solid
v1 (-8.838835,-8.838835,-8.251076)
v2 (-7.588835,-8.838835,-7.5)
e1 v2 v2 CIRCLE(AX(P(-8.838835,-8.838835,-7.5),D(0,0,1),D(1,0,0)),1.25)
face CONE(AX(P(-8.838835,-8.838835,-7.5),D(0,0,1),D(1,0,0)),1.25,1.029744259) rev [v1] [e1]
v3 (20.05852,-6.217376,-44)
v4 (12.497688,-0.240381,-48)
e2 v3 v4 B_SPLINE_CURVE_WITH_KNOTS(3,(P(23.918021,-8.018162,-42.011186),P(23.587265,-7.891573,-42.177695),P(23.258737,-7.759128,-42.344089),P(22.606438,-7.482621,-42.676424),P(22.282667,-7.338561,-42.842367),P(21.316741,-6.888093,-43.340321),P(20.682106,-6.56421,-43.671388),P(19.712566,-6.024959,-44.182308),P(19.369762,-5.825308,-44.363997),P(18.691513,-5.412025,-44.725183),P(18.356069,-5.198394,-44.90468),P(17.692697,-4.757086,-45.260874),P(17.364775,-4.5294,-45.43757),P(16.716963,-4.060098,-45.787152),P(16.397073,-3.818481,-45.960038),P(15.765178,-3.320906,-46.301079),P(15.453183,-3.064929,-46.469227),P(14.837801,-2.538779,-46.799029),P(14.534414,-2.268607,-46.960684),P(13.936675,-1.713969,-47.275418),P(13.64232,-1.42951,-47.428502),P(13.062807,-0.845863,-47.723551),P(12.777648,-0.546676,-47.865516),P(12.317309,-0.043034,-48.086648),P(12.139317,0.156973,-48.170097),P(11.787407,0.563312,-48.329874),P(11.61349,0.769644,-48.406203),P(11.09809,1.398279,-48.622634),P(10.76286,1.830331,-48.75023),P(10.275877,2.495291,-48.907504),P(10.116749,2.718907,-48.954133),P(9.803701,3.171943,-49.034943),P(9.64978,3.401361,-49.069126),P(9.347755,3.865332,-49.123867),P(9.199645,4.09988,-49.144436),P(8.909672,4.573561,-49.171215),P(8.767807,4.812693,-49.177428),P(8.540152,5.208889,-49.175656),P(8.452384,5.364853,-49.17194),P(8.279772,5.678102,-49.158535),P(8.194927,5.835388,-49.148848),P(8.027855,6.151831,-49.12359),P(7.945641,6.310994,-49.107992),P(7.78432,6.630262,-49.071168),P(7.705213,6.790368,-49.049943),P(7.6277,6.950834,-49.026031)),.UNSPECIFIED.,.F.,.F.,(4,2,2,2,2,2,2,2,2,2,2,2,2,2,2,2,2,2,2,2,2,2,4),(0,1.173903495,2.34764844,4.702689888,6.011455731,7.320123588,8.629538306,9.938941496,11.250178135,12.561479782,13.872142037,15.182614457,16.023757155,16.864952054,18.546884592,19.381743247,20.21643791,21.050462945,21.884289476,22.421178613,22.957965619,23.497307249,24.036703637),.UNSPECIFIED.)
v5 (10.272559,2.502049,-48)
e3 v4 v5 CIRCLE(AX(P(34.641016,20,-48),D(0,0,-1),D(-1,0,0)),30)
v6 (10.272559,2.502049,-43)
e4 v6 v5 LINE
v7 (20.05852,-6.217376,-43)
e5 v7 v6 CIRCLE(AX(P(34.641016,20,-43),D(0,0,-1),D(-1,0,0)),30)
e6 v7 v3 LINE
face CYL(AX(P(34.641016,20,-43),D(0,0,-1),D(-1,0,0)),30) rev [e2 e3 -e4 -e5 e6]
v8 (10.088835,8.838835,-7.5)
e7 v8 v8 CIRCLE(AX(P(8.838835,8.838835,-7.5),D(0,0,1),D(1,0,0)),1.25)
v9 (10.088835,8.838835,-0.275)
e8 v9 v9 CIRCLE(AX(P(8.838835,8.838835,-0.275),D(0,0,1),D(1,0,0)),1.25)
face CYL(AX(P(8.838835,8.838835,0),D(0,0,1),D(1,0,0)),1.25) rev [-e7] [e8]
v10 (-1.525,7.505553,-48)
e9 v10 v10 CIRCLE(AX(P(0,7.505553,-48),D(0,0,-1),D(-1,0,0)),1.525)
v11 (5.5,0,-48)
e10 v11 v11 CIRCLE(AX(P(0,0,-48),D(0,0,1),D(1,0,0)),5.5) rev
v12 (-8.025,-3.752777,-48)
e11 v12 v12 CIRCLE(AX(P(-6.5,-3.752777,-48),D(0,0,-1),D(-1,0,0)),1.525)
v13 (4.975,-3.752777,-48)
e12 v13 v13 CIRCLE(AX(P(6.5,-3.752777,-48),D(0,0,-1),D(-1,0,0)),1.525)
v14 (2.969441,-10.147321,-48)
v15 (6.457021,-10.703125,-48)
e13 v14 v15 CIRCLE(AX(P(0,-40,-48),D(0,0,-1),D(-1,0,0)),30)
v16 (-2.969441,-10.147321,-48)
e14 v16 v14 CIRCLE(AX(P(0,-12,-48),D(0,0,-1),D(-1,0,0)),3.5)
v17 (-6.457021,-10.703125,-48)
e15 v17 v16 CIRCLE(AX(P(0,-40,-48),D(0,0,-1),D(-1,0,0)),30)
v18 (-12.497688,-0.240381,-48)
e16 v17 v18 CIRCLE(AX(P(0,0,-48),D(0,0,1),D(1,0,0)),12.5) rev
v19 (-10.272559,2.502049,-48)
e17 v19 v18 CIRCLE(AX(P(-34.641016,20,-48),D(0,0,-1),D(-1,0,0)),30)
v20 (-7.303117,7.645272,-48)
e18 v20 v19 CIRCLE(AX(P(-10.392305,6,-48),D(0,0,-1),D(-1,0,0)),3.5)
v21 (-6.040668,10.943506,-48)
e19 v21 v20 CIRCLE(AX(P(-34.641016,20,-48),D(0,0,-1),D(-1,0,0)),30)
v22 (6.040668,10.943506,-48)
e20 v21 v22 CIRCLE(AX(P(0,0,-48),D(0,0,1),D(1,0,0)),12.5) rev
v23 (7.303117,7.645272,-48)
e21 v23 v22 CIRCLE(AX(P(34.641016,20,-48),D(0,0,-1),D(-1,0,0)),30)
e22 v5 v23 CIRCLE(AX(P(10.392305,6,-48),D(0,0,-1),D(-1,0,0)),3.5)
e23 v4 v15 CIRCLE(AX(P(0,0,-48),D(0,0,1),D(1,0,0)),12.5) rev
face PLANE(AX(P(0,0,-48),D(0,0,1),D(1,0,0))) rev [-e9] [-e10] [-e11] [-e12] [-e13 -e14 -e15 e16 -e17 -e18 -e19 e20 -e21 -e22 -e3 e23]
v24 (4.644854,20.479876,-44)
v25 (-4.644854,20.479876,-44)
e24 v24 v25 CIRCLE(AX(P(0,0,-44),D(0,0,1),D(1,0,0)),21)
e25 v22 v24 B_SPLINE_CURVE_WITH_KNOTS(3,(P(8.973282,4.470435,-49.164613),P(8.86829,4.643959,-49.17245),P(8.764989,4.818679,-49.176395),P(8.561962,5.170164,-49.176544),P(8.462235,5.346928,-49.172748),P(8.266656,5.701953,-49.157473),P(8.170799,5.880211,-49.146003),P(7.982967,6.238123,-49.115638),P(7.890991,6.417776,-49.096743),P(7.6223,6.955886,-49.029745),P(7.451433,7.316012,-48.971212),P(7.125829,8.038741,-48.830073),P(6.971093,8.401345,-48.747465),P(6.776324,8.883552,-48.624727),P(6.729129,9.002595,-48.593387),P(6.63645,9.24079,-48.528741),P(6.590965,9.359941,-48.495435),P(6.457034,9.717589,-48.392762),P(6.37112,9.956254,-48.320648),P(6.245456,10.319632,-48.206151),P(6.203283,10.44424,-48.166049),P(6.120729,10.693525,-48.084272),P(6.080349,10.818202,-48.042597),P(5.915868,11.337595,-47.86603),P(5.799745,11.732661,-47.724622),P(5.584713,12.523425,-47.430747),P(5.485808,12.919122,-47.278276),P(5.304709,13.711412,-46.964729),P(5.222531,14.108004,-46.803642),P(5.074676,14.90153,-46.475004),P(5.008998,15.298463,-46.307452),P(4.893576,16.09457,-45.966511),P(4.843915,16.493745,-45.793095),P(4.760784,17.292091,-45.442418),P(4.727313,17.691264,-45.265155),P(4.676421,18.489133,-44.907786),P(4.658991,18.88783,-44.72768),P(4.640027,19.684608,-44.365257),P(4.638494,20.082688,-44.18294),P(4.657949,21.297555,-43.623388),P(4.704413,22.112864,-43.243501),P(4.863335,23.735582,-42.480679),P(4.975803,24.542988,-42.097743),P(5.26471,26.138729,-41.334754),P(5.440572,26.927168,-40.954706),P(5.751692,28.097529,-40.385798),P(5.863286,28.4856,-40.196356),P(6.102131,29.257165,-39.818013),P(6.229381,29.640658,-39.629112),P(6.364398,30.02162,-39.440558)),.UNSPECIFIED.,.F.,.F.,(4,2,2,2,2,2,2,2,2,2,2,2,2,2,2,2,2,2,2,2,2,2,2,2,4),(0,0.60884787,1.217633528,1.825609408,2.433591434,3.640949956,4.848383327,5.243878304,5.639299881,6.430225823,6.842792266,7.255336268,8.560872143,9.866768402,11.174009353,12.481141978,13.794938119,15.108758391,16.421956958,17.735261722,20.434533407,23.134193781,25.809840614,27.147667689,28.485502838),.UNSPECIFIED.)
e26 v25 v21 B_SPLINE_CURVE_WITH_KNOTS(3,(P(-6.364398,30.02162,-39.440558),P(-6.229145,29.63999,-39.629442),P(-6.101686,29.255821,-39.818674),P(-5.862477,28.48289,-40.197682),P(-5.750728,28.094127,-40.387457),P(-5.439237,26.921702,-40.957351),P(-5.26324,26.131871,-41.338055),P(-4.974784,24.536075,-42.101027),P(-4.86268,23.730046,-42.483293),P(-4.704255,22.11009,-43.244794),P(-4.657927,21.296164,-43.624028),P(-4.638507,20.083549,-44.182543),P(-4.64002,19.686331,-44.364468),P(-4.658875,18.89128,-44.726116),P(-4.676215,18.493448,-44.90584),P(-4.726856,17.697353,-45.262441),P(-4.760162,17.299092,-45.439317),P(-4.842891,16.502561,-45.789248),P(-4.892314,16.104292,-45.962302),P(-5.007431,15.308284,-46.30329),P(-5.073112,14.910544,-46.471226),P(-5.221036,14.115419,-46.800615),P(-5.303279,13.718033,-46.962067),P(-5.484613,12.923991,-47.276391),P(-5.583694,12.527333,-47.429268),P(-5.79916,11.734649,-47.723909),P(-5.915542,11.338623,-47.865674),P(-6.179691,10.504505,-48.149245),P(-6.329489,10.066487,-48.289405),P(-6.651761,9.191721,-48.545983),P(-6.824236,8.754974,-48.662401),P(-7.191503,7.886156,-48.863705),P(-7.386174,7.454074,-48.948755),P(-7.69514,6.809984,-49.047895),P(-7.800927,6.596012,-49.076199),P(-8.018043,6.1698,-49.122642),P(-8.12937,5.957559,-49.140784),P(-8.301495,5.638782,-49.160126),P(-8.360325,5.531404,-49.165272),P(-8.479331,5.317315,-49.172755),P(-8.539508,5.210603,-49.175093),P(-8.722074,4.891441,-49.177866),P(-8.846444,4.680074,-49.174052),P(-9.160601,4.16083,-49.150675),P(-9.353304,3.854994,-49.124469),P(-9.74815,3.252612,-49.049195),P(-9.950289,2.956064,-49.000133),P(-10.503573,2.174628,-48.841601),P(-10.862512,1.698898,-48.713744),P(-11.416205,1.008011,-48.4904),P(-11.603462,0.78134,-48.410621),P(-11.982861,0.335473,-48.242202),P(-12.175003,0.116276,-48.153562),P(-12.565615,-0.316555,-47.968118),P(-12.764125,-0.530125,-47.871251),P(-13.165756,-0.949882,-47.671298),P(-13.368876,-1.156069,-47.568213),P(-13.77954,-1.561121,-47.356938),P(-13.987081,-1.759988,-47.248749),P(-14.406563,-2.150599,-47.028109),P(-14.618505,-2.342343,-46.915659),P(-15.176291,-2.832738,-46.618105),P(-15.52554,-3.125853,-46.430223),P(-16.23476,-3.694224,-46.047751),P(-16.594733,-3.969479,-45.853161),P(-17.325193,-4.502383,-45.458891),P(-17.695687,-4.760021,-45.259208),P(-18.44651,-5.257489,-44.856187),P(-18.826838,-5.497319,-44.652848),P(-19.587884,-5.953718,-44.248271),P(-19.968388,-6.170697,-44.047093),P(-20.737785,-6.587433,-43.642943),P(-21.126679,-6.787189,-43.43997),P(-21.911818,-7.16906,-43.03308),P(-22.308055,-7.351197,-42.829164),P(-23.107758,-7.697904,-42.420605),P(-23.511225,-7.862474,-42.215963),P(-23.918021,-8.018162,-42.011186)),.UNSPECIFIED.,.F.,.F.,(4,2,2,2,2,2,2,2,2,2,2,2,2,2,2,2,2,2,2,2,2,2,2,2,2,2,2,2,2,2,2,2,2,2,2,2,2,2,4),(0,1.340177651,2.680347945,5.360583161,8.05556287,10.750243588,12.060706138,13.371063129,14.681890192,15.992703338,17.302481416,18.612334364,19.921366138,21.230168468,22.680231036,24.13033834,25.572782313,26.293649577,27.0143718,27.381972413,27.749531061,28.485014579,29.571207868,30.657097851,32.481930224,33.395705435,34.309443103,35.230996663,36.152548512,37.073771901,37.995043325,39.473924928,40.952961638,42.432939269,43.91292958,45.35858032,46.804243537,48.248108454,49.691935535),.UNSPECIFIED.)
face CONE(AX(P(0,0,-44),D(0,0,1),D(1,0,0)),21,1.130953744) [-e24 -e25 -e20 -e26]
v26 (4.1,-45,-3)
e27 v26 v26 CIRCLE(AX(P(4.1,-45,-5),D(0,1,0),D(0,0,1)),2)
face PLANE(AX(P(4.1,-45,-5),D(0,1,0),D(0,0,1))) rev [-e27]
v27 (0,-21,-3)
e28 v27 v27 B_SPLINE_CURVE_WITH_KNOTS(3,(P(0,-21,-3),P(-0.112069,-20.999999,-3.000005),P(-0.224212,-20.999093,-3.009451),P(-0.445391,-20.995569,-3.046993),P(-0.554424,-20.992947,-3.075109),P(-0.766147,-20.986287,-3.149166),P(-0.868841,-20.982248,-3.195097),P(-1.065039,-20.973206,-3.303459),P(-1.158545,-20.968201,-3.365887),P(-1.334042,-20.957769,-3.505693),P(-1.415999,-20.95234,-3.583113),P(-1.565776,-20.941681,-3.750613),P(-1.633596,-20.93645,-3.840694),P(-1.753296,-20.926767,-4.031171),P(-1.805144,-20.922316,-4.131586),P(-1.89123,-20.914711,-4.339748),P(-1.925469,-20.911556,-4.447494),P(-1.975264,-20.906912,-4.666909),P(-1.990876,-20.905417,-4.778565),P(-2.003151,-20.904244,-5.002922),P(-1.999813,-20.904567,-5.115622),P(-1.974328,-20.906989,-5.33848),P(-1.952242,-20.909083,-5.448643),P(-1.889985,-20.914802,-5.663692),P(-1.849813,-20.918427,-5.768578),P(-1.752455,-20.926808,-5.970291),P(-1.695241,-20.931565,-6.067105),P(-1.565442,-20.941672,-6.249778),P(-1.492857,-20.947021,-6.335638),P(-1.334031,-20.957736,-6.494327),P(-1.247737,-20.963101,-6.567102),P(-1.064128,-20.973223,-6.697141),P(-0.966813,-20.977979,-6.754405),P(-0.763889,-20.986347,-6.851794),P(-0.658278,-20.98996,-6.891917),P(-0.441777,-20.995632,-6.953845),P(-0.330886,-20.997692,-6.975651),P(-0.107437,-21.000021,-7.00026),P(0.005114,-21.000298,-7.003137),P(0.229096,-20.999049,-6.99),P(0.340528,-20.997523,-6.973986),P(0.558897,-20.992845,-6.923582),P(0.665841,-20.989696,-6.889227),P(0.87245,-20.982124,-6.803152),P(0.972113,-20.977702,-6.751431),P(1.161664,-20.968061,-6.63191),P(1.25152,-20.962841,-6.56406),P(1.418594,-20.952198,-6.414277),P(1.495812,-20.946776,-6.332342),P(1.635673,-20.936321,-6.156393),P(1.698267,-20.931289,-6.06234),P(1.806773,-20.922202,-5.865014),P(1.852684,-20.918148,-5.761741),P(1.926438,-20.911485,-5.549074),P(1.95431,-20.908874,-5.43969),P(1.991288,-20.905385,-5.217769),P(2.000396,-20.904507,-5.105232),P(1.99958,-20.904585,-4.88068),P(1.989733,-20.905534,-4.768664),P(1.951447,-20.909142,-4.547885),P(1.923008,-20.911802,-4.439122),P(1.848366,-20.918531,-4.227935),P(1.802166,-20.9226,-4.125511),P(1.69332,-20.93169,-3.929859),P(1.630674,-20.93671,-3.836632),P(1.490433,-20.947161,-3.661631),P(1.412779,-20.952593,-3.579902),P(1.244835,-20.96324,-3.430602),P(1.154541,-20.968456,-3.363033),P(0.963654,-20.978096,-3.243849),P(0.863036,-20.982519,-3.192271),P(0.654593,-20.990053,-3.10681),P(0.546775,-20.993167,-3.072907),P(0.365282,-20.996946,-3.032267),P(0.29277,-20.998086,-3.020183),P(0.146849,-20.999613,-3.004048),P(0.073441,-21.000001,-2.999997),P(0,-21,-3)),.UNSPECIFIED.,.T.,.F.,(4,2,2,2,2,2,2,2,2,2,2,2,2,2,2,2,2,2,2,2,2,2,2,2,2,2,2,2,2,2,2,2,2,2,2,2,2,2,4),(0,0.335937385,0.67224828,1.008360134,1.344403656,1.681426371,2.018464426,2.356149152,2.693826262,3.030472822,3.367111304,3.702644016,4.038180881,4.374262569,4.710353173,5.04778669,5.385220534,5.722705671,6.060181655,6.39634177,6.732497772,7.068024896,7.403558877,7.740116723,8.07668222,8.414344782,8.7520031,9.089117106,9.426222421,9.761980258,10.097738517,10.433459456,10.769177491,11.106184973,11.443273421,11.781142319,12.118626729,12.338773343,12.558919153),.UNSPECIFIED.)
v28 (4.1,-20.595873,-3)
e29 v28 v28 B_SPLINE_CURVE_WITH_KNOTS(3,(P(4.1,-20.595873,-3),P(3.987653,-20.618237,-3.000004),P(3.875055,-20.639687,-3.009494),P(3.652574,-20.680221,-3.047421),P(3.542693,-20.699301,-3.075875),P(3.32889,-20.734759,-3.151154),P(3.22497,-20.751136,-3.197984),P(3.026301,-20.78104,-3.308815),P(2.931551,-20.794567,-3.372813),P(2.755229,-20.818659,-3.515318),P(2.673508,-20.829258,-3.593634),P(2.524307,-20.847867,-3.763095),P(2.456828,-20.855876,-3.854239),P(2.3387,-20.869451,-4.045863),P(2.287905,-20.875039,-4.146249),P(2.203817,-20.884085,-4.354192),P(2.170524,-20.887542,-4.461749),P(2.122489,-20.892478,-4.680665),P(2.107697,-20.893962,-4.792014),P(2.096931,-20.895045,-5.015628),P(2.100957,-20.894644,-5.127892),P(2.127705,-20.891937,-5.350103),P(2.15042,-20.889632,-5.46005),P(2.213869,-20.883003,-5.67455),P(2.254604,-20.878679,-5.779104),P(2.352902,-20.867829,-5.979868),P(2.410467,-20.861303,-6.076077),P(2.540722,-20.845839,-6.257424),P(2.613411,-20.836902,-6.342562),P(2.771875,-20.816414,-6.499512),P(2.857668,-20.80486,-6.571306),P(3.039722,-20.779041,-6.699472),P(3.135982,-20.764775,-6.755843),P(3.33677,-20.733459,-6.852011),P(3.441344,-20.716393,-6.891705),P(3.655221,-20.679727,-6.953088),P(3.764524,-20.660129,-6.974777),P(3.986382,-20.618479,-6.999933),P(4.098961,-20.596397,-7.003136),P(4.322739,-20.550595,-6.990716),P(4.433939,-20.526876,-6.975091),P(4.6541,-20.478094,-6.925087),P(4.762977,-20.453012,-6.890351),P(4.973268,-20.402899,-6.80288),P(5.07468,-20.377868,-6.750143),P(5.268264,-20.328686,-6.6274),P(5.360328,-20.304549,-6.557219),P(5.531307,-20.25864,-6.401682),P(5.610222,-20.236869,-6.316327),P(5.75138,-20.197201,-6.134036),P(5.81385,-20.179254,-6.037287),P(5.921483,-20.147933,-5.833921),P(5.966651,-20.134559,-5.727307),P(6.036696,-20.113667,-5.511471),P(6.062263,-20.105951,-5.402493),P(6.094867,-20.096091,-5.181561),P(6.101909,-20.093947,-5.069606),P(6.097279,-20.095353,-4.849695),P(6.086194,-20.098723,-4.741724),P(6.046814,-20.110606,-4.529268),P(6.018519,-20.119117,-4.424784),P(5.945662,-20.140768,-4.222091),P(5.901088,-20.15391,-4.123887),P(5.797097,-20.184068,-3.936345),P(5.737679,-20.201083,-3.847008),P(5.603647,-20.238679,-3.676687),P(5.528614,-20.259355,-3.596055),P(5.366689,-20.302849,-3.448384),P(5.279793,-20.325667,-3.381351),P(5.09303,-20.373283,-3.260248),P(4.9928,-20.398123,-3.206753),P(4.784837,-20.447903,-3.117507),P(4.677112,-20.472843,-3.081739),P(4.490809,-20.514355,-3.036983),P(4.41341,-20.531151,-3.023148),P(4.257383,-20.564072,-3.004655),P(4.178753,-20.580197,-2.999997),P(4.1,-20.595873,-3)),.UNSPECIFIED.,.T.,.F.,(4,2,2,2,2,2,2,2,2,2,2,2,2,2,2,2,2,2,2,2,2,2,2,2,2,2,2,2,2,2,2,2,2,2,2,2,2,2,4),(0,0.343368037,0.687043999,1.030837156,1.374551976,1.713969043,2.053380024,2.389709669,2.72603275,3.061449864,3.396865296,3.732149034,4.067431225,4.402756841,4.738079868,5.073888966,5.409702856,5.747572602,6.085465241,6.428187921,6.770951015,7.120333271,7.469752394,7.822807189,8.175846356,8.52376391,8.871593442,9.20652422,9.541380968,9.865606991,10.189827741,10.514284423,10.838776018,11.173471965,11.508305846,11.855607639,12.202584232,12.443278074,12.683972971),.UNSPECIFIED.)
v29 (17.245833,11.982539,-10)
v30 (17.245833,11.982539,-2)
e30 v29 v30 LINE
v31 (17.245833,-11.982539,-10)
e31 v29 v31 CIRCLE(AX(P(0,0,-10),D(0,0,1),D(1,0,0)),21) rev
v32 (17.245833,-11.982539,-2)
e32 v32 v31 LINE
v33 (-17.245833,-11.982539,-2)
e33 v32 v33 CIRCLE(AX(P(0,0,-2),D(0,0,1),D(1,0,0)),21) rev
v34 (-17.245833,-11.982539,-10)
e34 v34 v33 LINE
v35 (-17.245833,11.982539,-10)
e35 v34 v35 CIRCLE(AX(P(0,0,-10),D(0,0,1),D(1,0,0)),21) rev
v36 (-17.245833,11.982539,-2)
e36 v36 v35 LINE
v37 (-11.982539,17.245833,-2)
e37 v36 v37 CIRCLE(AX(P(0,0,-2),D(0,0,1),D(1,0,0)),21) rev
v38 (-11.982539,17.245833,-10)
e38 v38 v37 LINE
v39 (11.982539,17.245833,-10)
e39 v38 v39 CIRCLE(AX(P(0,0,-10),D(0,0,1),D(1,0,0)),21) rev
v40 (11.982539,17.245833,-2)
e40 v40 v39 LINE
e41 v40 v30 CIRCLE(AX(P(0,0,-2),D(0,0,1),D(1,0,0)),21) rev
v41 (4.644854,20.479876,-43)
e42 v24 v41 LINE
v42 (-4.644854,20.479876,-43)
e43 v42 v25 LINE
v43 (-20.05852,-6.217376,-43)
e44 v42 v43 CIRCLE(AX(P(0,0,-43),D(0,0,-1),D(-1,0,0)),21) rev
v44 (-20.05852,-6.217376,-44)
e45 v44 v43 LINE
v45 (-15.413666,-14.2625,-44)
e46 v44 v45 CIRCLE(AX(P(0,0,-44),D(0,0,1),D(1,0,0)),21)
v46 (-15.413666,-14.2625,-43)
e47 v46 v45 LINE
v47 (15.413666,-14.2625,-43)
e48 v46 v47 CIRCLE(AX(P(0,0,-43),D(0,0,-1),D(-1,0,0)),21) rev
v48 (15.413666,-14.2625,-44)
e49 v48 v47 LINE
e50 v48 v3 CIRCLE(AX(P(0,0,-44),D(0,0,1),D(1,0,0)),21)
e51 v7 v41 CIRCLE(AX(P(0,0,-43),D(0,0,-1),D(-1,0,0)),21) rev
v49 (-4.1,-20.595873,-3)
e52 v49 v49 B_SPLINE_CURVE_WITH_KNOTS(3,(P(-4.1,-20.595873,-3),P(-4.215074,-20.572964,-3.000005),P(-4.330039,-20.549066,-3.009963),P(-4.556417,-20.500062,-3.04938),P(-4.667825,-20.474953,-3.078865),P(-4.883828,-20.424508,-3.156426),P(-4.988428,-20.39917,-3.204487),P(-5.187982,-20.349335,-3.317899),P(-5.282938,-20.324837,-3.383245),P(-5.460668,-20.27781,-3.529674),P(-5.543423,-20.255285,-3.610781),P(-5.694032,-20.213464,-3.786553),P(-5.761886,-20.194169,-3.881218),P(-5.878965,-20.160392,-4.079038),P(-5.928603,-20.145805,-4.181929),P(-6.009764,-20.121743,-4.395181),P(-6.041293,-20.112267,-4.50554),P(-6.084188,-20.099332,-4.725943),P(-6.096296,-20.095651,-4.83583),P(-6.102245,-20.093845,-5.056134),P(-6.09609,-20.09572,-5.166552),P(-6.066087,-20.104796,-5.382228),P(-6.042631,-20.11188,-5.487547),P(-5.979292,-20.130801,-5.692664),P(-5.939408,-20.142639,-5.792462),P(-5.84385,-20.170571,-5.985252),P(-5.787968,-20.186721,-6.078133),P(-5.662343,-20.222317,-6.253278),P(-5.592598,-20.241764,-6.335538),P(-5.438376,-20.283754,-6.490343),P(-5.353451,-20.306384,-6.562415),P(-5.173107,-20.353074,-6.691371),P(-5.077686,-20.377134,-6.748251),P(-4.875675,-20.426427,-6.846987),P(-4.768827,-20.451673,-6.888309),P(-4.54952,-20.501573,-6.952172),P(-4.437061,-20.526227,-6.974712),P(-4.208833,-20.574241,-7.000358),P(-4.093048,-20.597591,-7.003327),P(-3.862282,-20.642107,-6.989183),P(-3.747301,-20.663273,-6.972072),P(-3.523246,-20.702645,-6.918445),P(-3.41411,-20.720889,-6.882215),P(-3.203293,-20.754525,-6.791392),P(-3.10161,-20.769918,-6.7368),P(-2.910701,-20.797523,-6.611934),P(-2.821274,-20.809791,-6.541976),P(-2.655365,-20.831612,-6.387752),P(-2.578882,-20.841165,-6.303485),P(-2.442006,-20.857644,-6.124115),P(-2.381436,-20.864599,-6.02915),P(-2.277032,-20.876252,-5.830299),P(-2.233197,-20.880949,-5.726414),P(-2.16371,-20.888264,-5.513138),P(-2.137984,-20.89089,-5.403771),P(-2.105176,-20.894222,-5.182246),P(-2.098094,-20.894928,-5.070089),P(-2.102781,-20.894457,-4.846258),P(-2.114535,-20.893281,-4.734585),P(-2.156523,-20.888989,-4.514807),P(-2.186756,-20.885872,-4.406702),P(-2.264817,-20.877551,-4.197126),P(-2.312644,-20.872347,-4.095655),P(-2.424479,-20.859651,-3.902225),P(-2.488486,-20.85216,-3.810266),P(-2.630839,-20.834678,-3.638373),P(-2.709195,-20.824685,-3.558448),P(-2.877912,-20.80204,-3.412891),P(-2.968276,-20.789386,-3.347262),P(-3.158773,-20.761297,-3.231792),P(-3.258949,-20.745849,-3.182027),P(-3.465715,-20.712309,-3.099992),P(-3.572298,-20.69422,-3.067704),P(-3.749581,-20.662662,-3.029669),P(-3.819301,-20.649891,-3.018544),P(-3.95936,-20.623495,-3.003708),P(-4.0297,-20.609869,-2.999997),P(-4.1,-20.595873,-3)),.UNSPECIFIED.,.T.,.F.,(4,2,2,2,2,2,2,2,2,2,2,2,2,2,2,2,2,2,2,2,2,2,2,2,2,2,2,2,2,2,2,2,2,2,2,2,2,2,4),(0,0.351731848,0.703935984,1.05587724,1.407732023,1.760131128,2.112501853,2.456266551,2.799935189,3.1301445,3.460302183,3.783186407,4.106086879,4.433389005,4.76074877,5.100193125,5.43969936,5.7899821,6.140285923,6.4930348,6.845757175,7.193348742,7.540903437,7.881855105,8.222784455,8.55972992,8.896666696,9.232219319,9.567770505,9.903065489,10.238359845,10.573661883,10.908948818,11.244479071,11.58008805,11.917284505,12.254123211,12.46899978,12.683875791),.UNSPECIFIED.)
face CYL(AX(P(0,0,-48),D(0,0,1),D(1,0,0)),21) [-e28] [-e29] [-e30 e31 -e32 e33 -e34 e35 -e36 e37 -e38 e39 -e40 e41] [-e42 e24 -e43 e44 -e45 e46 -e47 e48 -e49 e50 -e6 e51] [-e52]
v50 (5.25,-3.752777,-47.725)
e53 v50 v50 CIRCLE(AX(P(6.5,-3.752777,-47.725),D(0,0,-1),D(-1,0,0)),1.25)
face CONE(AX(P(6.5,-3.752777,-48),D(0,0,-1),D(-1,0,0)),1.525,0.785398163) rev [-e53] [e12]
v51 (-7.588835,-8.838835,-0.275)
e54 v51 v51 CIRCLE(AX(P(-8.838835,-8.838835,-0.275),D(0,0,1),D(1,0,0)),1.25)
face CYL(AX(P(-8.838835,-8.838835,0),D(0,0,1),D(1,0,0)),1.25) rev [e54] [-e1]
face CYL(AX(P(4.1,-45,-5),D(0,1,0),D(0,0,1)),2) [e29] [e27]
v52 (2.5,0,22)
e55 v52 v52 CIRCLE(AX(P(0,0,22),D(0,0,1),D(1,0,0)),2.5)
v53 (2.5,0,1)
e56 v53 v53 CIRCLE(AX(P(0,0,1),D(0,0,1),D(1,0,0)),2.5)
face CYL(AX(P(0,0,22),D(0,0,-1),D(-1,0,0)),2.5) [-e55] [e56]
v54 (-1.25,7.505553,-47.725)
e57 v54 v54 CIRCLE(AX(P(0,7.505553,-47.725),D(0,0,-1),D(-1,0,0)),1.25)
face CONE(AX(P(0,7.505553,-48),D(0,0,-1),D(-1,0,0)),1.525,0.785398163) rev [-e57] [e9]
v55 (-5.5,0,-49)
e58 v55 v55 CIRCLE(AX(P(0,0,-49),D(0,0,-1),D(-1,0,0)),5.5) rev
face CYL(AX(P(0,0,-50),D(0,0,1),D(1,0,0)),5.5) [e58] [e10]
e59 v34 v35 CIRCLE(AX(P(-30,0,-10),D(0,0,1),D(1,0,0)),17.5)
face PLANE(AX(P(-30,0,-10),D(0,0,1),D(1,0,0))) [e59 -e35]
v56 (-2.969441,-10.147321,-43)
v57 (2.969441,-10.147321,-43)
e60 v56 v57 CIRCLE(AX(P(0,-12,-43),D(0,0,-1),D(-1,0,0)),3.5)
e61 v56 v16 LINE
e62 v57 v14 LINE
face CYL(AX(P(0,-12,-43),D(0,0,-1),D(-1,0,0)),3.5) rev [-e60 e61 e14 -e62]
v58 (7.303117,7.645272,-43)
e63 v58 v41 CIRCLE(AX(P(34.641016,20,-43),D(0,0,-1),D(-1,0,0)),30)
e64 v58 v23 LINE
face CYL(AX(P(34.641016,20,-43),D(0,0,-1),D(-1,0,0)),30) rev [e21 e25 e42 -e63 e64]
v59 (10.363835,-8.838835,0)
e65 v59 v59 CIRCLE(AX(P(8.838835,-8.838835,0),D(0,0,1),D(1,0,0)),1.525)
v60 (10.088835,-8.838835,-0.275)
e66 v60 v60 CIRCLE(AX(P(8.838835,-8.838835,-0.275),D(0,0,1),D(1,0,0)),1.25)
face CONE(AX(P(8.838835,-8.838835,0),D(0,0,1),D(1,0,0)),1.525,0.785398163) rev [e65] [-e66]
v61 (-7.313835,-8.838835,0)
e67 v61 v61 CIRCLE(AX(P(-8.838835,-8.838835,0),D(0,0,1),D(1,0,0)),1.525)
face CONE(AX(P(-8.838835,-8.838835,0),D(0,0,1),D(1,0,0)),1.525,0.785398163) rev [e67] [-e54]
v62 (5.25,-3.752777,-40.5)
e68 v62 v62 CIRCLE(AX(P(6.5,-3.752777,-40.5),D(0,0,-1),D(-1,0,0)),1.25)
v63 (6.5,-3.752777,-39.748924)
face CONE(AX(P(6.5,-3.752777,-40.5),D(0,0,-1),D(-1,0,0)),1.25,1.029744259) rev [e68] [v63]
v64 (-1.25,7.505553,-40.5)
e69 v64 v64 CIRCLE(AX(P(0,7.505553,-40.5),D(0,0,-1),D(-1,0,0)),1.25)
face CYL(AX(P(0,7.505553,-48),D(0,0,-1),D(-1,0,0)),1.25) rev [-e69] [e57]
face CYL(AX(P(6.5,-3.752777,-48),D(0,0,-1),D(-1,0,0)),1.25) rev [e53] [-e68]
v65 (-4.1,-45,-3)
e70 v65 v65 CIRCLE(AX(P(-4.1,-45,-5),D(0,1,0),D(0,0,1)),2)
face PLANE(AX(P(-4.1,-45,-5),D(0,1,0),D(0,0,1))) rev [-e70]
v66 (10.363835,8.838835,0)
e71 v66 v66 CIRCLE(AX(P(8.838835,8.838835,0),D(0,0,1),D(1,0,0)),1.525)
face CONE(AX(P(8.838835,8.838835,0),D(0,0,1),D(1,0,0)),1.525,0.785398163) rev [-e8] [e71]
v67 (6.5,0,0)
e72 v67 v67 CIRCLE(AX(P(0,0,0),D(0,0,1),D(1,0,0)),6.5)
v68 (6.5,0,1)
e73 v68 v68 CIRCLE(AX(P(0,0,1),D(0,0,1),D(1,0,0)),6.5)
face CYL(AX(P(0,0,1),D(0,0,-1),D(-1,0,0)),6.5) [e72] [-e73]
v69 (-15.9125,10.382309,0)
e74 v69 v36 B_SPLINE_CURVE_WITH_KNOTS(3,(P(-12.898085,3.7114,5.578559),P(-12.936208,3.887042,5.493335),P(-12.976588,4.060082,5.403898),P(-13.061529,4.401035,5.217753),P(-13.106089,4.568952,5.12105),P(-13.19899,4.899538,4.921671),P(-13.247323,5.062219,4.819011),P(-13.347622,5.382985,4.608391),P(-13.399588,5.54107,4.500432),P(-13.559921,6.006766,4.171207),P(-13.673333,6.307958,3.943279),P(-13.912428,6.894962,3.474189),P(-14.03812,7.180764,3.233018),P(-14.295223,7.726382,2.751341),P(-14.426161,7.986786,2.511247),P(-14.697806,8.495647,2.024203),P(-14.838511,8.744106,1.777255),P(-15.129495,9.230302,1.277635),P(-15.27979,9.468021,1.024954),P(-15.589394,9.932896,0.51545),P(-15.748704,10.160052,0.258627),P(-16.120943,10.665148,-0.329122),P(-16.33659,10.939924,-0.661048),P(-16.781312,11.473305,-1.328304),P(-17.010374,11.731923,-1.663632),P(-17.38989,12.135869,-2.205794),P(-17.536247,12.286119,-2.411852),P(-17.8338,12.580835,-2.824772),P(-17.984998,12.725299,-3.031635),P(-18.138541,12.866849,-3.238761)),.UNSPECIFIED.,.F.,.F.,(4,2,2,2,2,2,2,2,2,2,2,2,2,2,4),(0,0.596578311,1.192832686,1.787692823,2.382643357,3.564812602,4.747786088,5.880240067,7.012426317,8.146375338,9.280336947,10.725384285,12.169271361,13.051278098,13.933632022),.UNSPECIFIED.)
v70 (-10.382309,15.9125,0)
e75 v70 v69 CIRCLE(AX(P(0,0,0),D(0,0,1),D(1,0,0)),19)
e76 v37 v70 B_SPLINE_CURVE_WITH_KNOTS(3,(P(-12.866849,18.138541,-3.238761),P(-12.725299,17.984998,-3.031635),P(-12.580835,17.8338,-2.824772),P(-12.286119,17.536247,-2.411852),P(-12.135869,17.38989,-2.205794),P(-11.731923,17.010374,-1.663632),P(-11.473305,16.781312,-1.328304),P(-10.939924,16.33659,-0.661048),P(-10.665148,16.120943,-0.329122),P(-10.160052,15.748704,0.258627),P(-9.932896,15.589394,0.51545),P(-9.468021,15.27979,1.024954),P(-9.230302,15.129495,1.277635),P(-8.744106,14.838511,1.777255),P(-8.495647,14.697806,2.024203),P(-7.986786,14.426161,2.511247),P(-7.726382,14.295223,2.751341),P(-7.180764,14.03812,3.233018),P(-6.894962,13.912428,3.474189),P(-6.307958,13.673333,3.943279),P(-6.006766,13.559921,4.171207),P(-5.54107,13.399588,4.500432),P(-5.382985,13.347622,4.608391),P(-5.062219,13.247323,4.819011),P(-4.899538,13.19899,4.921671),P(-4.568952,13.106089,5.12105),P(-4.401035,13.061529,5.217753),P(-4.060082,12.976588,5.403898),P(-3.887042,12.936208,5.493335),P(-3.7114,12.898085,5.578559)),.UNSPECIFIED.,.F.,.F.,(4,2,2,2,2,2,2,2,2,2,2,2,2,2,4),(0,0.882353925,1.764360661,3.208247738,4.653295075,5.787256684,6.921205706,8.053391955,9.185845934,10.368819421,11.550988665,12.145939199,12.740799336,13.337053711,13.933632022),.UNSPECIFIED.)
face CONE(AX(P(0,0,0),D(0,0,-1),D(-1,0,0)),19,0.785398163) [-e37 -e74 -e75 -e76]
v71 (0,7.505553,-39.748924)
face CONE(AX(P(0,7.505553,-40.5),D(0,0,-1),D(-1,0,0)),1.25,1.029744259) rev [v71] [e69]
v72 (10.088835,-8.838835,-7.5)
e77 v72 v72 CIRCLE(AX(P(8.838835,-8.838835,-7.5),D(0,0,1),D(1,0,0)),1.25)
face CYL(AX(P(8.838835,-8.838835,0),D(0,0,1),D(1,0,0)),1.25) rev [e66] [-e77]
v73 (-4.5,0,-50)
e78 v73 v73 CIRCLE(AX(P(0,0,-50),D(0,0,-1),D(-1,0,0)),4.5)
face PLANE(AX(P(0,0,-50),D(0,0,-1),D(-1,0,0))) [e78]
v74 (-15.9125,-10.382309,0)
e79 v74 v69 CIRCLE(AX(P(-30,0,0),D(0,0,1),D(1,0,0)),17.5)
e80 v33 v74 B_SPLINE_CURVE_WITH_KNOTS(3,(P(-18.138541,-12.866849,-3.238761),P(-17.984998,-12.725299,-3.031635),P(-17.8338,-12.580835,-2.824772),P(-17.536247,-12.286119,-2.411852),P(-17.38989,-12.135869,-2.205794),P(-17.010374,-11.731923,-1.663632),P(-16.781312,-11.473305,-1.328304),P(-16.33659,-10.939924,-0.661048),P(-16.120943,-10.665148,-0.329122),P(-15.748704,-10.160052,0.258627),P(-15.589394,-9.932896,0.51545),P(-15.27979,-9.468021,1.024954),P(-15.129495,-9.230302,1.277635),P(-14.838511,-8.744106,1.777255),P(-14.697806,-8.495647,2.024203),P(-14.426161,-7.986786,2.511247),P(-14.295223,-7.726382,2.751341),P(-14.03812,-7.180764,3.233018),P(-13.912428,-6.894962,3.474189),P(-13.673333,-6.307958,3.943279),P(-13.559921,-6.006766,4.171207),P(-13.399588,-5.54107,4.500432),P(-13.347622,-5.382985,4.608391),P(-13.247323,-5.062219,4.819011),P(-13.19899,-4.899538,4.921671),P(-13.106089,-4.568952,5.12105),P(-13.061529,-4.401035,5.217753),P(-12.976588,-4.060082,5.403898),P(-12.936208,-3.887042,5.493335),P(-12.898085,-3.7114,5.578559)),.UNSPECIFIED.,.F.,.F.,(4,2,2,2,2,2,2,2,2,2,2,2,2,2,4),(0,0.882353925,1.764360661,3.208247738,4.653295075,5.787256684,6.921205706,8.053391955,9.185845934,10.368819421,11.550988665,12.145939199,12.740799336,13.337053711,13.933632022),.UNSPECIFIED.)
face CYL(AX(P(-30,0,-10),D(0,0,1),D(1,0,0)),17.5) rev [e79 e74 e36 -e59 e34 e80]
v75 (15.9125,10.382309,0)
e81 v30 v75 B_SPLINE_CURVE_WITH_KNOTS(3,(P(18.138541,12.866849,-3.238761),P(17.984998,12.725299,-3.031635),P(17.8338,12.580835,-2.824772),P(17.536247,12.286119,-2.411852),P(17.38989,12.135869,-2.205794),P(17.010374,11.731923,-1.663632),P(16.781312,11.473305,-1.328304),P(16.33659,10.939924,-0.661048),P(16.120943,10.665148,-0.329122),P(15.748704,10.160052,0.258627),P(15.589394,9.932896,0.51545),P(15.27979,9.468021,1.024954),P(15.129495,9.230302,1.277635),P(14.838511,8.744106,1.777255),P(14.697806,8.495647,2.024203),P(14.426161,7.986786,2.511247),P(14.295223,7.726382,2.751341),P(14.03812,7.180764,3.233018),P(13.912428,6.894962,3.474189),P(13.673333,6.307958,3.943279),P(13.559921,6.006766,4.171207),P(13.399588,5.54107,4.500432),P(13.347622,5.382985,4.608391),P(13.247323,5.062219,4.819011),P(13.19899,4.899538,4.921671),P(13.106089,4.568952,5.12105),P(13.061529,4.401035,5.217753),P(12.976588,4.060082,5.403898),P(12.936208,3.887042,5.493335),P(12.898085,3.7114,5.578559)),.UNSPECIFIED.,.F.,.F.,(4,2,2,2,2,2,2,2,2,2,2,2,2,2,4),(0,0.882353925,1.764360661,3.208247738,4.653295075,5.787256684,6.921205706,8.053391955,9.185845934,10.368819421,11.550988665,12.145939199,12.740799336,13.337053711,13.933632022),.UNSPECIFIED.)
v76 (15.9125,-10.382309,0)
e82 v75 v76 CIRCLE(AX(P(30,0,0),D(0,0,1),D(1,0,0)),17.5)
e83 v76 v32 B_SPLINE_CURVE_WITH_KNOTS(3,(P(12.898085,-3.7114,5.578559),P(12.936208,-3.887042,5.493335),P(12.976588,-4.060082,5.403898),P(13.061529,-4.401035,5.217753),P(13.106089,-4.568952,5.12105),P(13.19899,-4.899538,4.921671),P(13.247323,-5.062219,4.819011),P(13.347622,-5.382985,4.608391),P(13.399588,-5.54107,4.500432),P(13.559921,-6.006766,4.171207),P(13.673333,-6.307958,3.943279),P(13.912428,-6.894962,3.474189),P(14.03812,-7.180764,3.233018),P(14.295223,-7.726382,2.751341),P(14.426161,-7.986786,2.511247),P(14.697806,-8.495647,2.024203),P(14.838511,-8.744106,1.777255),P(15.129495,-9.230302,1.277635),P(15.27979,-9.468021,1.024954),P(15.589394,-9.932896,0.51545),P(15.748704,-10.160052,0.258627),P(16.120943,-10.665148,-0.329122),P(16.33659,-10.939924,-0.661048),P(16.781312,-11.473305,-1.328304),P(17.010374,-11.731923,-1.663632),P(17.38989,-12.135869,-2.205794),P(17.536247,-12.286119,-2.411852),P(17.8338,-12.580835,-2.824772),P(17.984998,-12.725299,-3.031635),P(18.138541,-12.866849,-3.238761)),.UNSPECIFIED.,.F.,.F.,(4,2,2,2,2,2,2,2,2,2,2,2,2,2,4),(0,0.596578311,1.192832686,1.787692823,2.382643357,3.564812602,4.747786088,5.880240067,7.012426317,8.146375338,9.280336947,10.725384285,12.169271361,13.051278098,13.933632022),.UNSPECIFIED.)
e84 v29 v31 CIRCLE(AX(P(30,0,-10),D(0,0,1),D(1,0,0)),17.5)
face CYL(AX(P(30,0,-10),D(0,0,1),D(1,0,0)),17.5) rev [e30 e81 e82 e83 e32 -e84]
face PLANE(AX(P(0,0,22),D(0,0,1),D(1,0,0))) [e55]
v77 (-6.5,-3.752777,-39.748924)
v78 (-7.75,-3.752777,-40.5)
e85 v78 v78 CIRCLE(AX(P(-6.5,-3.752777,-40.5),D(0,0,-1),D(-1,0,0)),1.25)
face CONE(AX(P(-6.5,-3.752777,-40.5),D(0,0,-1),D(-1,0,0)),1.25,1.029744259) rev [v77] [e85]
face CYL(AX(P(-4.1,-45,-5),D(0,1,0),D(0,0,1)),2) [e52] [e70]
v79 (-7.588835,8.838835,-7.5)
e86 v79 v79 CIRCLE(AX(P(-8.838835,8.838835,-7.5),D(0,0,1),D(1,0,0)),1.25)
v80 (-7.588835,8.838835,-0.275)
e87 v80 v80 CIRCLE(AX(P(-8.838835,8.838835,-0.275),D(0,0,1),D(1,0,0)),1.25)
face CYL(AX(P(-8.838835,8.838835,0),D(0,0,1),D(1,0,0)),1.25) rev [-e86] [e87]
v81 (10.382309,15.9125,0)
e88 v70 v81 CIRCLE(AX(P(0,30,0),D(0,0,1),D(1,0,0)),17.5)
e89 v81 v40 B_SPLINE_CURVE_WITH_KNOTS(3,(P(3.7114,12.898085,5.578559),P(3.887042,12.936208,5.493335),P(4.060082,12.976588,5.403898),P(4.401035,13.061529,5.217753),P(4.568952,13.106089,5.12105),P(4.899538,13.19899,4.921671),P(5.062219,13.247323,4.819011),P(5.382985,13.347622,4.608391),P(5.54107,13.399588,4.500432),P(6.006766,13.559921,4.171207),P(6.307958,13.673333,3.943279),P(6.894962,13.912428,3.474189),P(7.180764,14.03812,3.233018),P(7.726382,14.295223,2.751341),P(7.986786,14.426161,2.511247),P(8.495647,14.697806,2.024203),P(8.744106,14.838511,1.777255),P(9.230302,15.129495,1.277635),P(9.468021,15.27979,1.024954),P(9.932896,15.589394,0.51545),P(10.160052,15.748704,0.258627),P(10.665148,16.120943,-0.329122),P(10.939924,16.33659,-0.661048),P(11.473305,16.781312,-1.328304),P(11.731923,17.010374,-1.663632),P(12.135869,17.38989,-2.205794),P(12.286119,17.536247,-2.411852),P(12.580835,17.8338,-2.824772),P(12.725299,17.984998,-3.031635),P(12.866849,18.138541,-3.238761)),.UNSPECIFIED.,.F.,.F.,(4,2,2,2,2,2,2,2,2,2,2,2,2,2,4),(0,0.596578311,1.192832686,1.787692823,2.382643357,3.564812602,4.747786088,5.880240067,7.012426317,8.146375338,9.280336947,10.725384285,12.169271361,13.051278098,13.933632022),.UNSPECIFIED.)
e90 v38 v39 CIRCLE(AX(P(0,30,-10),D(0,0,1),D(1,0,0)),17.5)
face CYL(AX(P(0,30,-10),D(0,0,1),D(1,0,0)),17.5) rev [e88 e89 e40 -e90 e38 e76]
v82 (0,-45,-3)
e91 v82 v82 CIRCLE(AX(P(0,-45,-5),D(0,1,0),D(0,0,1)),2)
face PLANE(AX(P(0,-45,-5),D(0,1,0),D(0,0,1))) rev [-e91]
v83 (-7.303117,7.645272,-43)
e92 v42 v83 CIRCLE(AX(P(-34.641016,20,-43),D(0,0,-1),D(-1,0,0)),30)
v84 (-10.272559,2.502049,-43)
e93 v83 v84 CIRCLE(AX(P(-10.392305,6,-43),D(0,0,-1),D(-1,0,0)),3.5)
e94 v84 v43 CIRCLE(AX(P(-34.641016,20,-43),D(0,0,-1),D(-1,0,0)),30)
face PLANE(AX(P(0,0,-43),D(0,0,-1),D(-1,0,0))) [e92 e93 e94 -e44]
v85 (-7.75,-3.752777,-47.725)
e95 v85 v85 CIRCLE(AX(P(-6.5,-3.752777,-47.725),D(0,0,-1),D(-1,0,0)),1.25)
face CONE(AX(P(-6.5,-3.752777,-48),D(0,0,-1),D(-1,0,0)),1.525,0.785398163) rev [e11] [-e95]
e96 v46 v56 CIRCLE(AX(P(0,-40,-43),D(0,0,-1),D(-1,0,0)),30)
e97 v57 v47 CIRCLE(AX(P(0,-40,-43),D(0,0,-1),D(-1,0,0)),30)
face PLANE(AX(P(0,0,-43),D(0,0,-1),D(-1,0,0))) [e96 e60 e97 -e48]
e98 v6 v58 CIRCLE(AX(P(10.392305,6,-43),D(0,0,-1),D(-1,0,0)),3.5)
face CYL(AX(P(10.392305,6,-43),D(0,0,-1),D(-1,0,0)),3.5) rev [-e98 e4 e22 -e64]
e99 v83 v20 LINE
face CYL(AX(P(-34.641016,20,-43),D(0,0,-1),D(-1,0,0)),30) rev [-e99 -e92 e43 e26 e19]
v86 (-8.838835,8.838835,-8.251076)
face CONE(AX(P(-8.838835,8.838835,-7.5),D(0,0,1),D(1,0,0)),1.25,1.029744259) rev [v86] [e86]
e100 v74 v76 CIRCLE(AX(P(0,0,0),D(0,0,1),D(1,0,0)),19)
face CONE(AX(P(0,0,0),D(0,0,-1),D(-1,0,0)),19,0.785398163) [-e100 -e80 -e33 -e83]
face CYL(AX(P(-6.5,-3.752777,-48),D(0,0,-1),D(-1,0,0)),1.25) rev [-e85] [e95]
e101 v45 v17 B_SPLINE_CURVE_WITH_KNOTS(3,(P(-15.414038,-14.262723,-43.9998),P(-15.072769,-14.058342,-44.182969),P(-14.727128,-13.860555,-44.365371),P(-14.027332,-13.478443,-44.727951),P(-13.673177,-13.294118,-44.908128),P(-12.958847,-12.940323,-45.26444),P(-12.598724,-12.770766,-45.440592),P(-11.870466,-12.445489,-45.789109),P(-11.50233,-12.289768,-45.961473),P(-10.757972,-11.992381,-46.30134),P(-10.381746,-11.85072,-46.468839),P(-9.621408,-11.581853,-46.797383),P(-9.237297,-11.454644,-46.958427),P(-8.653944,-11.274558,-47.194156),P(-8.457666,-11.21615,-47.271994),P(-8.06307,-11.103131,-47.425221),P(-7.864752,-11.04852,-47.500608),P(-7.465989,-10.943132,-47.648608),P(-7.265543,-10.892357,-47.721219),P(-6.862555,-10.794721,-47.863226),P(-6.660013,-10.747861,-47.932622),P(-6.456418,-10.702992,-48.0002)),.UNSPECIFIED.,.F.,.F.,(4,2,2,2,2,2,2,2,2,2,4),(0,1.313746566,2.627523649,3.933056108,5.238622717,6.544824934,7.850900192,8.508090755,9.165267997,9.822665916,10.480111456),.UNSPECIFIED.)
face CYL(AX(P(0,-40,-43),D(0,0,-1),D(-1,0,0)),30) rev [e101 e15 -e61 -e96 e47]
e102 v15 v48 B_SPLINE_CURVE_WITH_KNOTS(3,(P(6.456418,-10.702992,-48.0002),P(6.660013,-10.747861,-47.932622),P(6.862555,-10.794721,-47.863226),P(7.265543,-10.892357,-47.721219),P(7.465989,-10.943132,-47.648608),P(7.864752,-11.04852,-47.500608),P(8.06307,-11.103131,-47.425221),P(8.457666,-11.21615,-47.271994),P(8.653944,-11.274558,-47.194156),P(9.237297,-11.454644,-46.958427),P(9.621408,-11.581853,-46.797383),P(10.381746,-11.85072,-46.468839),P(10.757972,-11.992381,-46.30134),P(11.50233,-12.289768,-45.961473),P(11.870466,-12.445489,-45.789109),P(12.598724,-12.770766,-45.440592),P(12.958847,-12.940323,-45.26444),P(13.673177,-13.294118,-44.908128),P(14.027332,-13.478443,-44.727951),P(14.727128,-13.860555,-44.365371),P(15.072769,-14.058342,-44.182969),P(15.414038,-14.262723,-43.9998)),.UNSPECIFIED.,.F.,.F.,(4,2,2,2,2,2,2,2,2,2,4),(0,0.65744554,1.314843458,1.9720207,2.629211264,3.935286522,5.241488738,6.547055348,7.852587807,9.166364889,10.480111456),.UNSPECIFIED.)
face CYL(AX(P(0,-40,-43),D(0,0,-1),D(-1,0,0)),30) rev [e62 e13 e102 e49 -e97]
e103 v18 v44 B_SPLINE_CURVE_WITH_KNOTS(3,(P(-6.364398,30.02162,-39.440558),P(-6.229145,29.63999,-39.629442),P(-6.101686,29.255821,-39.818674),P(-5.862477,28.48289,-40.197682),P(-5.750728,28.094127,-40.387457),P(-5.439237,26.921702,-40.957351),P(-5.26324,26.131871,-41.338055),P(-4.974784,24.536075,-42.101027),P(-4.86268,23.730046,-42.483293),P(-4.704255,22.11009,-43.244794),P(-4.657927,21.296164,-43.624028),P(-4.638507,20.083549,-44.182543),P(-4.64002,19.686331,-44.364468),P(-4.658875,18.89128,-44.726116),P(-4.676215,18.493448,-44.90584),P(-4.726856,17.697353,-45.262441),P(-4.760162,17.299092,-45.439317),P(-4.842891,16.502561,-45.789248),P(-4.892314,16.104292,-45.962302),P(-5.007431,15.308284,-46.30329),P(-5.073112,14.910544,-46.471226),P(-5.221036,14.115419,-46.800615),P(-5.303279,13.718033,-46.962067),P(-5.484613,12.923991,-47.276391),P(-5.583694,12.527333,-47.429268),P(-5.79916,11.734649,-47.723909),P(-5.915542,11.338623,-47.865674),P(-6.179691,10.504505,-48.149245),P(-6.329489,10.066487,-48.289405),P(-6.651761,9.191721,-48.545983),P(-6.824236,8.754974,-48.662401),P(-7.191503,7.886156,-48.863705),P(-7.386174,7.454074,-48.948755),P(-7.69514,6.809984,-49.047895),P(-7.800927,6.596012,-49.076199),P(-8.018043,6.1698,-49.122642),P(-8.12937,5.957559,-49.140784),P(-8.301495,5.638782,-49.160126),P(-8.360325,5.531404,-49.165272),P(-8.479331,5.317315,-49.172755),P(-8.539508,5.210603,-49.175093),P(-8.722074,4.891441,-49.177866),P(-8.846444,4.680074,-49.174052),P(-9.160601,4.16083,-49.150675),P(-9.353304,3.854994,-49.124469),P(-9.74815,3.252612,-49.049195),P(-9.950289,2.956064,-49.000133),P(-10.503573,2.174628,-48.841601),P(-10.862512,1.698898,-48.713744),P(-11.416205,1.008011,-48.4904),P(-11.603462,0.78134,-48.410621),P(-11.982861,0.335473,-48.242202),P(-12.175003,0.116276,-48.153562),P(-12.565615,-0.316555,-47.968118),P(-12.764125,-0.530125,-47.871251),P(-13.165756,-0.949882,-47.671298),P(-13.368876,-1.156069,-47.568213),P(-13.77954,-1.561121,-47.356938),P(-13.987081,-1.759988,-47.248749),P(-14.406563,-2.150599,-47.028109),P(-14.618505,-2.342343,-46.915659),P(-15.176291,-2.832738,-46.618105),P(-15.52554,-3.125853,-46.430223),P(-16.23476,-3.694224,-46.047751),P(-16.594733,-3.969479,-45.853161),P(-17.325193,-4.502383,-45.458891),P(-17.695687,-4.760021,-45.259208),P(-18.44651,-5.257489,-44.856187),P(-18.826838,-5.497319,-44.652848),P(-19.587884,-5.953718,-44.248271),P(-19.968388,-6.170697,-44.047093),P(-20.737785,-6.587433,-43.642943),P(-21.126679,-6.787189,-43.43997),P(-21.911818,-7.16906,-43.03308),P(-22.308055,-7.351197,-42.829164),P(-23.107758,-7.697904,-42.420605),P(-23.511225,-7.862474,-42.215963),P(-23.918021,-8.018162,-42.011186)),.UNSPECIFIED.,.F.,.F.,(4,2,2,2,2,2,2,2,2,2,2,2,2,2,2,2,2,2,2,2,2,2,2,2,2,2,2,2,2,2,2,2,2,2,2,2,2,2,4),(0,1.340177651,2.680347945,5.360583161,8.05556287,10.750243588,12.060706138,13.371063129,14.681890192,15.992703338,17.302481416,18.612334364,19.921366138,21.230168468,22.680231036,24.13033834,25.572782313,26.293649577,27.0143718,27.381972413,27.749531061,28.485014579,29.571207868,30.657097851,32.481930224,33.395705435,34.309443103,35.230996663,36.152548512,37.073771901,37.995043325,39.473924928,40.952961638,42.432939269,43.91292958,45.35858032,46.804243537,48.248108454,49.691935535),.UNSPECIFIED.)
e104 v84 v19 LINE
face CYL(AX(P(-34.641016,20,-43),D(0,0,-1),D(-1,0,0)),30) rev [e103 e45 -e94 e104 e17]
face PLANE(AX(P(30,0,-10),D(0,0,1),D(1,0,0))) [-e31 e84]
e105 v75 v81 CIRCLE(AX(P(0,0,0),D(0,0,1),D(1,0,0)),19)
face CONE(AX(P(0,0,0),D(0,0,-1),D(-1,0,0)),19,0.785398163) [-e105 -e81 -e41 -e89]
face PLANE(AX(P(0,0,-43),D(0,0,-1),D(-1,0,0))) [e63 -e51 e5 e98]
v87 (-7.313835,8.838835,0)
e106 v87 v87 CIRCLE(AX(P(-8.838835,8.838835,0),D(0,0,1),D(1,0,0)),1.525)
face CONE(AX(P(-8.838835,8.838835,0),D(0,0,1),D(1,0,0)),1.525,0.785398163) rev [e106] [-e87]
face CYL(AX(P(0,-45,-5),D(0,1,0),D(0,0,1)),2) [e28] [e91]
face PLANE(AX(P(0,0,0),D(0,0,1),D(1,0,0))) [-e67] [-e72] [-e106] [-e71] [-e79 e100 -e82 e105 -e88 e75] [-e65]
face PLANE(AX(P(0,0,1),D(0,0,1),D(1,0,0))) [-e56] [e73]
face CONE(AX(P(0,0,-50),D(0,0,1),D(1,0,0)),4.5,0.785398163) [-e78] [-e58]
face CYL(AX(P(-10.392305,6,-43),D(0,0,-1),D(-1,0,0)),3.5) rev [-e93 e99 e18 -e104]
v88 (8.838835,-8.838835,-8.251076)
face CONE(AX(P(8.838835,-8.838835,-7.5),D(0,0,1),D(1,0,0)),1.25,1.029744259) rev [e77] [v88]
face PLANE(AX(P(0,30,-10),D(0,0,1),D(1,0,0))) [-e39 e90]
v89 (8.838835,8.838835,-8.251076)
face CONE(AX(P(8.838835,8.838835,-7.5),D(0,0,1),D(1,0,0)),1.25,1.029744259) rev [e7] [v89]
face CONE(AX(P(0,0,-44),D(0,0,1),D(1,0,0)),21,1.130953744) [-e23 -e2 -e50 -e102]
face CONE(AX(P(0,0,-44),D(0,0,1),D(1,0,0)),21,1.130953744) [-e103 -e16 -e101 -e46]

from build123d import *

# Parameters (mm, degrees)
SKETCH1_R                       = 21
BOSS_EXTRUDE1_DEPTH             = 48
SKETCH2_R                       = 2.5
BOSS_EXTRUDE2_DEPTH             = 22
M3X0_5_TAPPED_HOLE1_D           = 2.5
M3X0_5_TAPPED_HOLE1_DEPTH       = 7.5
M3X0_5_TAPPED_HOLE1_CSINK_D     = 3.05
M3X0_5_TAPPED_HOLE1_CSINK_ANGLE = 90
M3X0_5_TAPPED_HOLE1_TIP         = 0.751075774
M3X0_5_TAPPED_HOLE2_D           = 2.5
M3X0_5_TAPPED_HOLE2_DEPTH       = 7.5
M3X0_5_TAPPED_HOLE2_CSINK_D     = 3.05
M3X0_5_TAPPED_HOLE2_CSINK_ANGLE = 90
M3X0_5_TAPPED_HOLE2_TIP         = 0.751075774
CHAMFER2_SIZE                   = 8.5
CHAMFER2_SIZE2                  = 4
CUT_EXTRUDE1_DEPTH              = 5
SKETCH10_R                      = 5.5
BOSS_EXTRUDE3_DEPTH             = 2
CHAMFER1_SIZE                   = 1
CHAMFER3_SIZE                   = 2
SKETCH11_R                      = 17.5
CUT_EXTRUDE2_DEPTH              = 10
SKETCH12_R                      = 2
BOSS_EXTRUDE6_DEPTH             = 45
SKETCH13_R                      = 6.5
BOSS_EXTRUDE7_DEPTH             = 1


with BuildPart() as part:
    # Sketch1 → Boss-Extrude1 (new body)
    with BuildSketch(Plane.XY):
        Circle(SKETCH1_R)
    extrude(amount=-BOSS_EXTRUDE1_DEPTH)

    # Sketch2 → Boss-Extrude2 (add)
    with BuildSketch(Plane.XY):
        Circle(SKETCH2_R)
    extrude(amount=BOSS_EXTRUDE2_DEPTH)

    # M3x0.5 Tapped Hole1
    with Locations(Plane.XY):
        with Locations((-8.838834765, -8.838834765), (-8.838834765, 8.838834765), (8.838834765, 8.838834765), (8.838834765, -8.838834765)):
            CounterSinkHole(M3X0_5_TAPPED_HOLE1_D / 2, M3X0_5_TAPPED_HOLE1_CSINK_D / 2, depth=M3X0_5_TAPPED_HOLE1_DEPTH, counter_sink_angle=M3X0_5_TAPPED_HOLE1_CSINK_ANGLE)
            with Locations((0, 0, -(M3X0_5_TAPPED_HOLE1_DEPTH + M3X0_5_TAPPED_HOLE1_TIP / 2))):  # 118° drill point
                Cone(0, M3X0_5_TAPPED_HOLE1_D / 2, M3X0_5_TAPPED_HOLE1_TIP, mode=Mode.SUBTRACT)

    # M3x0.5 Tapped Hole2
    with Locations(Plane(origin=(0, 0, -48), x_dir=(-1, 0, 0), z_dir=(0, 0, -1))):
        with Locations((0, 7.505553499), (6.5, -3.75277675), (-6.5, -3.75277675)):
            CounterSinkHole(M3X0_5_TAPPED_HOLE2_D / 2, M3X0_5_TAPPED_HOLE2_CSINK_D / 2, depth=M3X0_5_TAPPED_HOLE2_DEPTH, counter_sink_angle=M3X0_5_TAPPED_HOLE2_CSINK_ANGLE)
            with Locations((0, 0, -(M3X0_5_TAPPED_HOLE2_DEPTH + M3X0_5_TAPPED_HOLE2_TIP / 2))):  # 118° drill point
                Cone(0, M3X0_5_TAPPED_HOLE2_D / 2, M3X0_5_TAPPED_HOLE2_TIP, mode=Mode.SUBTRACT)

    # Chamfer2
    chamfer2_edges = [part.edges().sort_by_distance(p)[0] for p in [
        (-21, 0, -48),
    ]]
    chamfer2_side = [part.faces().sort_by_distance(p)[0] for p in [
        (0, 0, -48),
    ]]
    chamfer(chamfer2_edges, length=CHAMFER2_SIZE, length2=CHAMFER2_SIZE2, reference=chamfer2_side[0])

    # Sketch9 → Cut-Extrude1 (cut)
    with BuildSketch(Plane(origin=(0, 0, -48), x_dir=(-1, 0, 0), z_dir=(0, 0, -1))):
        with BuildLine():
            ThreePointArc((-10.272558828, 2.502049044), (-7.361215932, 4.25), (-7.303117447, 7.645272385))
            ThreePointArc((-7.303117447, 7.645272385), (-60.621778265, 35), (-10.272558828, 2.502049044))
        make_face()
        with BuildLine():
            ThreePointArc((7.303117447, 7.645272385), (7.361215932, 4.25), (10.272558828, 2.502049044))
            ThreePointArc((10.272558828, 2.502049044), (60.621778265, 35), (7.303117447, 7.645272385))
        make_face()
        with BuildLine():
            ThreePointArc((2.96944138, -10.147321429), (0, -8.5), (-2.96944138, -10.147321429))
            ThreePointArc((-2.96944138, -10.147321429), (0, -70), (2.96944138, -10.147321429))
        make_face()
    extrude(amount=-CUT_EXTRUDE1_DEPTH, mode=Mode.SUBTRACT)

    # Sketch10 → Boss-Extrude3 (add)
    with BuildSketch(Plane(origin=(0, 0, -48), x_dir=(-1, 0, 0), z_dir=(0, 0, -1))):
        Circle(SKETCH10_R)
    extrude(amount=BOSS_EXTRUDE3_DEPTH)

    # Chamfer1
    chamfer1_edges = [part.edges().sort_by_distance(p)[0] for p in [
        (5.5, 0, -50),
    ]]
    chamfer(chamfer1_edges, length=CHAMFER1_SIZE)

    # Chamfer3
    chamfer3_edges = [part.edges().sort_by_distance(p)[0] for p in [
        (-21, 0, 0),
    ]]
    chamfer(chamfer3_edges, length=CHAMFER3_SIZE)

    # Sketch11 → Cut-Extrude2 (cut)
    with BuildSketch(Plane.XY):
        with Locations((-30, 0)):
            Circle(SKETCH11_R)
        with Locations((0, 30)):
            Circle(SKETCH11_R)
        with Locations((30, 0)):
            Circle(SKETCH11_R)
    extrude(amount=-CUT_EXTRUDE2_DEPTH, mode=Mode.SUBTRACT)

    # Sketch12 → Boss-Extrude6 (add)
    with BuildSketch(Plane(origin=(0, 0, 0), x_dir=(1, 0, 0), z_dir=(0, 1, 0))):
        with Locations((0, 5)):
            Circle(SKETCH12_R)
        with Locations((-4.1, 5)):
            Circle(SKETCH12_R)
        with Locations((4.1, 5)):
            Circle(SKETCH12_R)
    extrude(amount=-BOSS_EXTRUDE6_DEPTH)

    # Sketch13 → Boss-Extrude7 (add)
    with BuildSketch(Plane.XY):
        Circle(SKETCH13_R)
    extrude(amount=BOSS_EXTRUDE7_DEPTH)


solid = part.part
